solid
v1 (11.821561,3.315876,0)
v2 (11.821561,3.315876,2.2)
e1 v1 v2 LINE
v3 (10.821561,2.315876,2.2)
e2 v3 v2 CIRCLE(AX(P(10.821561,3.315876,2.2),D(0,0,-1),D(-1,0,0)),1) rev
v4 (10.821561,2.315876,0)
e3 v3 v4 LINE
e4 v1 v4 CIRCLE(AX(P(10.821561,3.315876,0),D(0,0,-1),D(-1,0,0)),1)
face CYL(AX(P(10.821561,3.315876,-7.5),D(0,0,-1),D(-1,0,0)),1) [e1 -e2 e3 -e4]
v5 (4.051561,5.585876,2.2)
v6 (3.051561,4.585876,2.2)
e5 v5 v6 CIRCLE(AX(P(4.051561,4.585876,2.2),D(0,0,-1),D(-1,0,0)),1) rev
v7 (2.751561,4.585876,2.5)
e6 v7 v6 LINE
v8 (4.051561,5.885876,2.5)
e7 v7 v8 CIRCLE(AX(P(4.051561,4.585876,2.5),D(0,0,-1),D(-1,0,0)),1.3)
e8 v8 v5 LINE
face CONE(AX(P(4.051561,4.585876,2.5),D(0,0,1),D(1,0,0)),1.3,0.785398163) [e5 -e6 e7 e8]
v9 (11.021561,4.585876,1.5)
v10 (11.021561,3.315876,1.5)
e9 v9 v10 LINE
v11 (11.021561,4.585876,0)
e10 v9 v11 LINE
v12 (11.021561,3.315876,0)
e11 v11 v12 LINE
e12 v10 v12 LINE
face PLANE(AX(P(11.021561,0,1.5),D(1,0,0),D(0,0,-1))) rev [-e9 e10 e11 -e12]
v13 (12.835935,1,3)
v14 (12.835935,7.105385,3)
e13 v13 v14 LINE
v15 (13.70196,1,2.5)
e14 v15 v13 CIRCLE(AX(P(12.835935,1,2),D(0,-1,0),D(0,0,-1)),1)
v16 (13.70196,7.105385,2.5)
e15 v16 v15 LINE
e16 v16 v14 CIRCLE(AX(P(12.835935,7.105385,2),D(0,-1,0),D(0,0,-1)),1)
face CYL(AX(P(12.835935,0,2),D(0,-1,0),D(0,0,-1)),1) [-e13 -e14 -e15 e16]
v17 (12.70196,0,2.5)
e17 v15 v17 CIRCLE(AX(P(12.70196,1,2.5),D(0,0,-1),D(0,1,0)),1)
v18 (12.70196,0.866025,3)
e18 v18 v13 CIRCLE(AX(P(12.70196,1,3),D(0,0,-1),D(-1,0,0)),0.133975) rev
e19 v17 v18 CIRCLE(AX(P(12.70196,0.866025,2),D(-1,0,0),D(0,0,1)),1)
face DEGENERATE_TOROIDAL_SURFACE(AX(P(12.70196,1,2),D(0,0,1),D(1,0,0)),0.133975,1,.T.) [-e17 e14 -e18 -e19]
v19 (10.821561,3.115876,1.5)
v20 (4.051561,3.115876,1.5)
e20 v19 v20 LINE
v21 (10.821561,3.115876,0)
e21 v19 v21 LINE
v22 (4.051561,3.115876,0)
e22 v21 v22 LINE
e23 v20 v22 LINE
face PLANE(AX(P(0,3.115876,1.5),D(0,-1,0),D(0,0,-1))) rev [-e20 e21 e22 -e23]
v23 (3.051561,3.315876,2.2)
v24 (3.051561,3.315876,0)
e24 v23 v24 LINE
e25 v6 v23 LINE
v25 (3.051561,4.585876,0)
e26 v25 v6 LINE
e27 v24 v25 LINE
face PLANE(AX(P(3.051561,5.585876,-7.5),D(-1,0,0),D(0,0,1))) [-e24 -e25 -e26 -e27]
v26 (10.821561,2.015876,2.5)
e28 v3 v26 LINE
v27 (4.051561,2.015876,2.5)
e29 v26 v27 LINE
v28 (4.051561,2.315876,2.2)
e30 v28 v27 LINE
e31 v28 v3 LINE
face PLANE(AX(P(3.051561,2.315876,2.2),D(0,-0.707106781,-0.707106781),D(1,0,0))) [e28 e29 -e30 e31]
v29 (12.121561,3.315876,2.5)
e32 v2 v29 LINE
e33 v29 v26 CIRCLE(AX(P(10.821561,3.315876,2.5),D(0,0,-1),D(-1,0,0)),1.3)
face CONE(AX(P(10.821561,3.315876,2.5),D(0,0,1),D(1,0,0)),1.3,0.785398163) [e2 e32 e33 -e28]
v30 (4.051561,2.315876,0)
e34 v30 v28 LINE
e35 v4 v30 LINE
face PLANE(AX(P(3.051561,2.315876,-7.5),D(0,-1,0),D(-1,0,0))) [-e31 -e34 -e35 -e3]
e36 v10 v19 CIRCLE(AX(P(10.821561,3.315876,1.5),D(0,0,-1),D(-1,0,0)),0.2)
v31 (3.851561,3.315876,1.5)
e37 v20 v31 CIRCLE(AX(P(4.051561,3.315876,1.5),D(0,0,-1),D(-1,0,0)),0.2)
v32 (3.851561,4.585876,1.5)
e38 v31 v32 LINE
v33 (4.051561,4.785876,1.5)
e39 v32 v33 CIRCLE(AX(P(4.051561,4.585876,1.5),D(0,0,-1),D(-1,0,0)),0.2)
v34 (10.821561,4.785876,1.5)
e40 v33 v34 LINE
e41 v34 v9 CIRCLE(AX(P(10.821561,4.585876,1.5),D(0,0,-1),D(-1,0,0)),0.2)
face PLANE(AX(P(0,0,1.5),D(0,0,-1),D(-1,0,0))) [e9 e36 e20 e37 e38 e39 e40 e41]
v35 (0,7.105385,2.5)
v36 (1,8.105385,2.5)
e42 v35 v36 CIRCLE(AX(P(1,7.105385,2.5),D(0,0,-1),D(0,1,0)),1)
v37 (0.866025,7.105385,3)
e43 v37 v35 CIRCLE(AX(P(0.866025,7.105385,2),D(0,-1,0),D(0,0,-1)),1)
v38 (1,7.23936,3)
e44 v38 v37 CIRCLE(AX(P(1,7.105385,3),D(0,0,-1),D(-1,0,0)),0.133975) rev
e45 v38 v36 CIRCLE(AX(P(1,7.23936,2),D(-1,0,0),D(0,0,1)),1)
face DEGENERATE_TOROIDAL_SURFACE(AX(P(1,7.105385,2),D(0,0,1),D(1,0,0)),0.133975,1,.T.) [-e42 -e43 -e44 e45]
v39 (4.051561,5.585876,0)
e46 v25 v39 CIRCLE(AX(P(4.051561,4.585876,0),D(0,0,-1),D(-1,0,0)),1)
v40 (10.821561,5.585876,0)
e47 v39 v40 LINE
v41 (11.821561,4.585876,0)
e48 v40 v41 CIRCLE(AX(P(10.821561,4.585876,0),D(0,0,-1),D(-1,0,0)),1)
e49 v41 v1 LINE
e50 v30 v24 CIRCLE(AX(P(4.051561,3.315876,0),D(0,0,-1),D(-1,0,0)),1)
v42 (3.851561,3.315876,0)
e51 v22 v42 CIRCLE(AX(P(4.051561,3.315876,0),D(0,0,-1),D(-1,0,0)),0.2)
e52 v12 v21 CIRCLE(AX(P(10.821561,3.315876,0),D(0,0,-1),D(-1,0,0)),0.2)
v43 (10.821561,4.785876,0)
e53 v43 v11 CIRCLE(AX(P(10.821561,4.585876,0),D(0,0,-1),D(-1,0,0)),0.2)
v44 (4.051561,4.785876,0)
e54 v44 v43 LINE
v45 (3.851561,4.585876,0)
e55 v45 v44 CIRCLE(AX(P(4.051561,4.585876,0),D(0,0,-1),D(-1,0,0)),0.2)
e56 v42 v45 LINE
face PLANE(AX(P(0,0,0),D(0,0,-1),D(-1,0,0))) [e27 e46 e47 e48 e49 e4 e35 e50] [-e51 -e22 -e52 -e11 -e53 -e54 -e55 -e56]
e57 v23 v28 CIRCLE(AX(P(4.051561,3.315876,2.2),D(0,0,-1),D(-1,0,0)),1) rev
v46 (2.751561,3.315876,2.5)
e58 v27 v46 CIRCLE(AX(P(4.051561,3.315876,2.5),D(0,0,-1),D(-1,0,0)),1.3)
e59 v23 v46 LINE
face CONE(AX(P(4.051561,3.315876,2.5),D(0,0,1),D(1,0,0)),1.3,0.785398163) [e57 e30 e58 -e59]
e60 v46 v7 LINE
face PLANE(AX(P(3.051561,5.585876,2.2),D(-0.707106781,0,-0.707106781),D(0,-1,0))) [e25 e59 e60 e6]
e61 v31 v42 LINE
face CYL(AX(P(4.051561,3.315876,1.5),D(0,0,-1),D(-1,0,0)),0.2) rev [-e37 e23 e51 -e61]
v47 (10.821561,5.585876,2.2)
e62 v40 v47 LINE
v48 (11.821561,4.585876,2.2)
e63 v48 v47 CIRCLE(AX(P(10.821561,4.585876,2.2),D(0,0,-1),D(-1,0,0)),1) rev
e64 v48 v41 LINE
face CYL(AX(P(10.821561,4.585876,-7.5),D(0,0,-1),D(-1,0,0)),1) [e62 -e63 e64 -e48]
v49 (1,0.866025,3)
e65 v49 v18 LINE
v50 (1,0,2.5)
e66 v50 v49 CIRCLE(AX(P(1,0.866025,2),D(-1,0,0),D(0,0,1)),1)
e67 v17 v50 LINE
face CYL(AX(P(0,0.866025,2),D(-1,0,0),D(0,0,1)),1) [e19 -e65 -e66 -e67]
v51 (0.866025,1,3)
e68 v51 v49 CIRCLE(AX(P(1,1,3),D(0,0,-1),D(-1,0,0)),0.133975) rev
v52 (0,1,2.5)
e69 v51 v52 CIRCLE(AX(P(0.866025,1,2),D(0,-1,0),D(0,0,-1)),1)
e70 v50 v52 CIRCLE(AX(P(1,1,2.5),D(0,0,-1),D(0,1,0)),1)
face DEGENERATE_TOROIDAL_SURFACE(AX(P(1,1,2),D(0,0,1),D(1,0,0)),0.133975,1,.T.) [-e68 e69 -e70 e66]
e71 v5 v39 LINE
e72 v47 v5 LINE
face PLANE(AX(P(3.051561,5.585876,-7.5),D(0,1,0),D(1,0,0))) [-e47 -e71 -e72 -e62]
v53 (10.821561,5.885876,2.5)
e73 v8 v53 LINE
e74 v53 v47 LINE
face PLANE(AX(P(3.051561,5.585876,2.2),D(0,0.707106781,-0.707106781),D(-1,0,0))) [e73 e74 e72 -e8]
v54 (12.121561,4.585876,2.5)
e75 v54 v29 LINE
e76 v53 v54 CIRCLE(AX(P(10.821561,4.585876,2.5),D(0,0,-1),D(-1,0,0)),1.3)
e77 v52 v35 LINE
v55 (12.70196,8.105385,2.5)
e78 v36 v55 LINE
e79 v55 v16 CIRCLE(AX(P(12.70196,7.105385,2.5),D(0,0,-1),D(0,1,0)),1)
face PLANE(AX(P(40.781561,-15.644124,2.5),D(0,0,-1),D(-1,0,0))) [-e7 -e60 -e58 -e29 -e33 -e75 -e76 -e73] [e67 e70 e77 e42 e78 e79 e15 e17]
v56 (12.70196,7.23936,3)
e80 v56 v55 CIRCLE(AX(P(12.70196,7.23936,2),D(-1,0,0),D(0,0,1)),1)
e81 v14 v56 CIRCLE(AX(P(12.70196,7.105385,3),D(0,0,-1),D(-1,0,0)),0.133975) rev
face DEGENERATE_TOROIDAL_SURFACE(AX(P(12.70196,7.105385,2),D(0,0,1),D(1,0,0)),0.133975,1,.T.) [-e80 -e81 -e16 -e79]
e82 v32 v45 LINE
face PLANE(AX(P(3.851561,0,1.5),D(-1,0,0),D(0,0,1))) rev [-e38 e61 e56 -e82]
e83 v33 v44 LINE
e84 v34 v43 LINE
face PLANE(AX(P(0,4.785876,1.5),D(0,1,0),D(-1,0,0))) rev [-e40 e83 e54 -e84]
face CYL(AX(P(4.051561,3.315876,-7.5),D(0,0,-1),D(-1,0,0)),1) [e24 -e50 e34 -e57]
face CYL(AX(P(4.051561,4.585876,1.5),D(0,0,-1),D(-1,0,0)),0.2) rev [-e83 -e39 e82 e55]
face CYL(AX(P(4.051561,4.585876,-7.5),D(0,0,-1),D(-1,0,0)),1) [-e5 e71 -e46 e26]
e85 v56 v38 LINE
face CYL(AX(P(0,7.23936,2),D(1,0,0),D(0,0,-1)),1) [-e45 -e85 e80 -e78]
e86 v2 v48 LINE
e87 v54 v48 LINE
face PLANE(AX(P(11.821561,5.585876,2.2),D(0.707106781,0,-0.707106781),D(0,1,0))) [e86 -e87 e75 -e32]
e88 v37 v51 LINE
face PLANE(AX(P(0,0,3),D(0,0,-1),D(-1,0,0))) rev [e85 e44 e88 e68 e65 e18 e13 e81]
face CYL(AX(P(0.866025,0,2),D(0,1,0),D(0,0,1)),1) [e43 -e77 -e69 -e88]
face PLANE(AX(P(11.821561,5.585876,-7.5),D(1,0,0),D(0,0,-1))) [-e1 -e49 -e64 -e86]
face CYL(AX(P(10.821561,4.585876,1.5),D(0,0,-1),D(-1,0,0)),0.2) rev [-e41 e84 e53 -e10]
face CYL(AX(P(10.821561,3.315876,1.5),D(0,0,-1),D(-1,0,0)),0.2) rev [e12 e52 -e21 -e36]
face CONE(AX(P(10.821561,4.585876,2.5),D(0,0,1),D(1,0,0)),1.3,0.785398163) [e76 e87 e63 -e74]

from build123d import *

# Parameters (mm, degrees)
SKETCH1_W           = 13.701960198
SKETCH1_H           = 8.105384906
BOSS_EXTRUDE1_DEPTH = 3
CAVITY1_OUTLINE_W   = 13.701960198
CAVITY1_OUTLINE_H   = 8.105384906
CAVITY1_DEPTH       = 2.5
CUT_EXTRUDE1_DEPTH  = 1.5
FILLET1_R           = 1
FILLET2_R           = 1


with BuildPart() as part:
    # Sketch1 → Boss-Extrude1 (new body)
    with BuildSketch(Plane.XY):
        with Locations((6.850980099, 4.052692453)):
            Rectangle(SKETCH1_W, SKETCH1_H)
    extrude(amount=BOSS_EXTRUDE1_DEPTH)

    # Cavity1: read off the stored shape, not the designer's step
    # Cavity1 outline → Cavity1 (cut)
    with BuildSketch(Plane.XY):
        with Locations((6.850980099, 4.052692453)):
            Rectangle(CAVITY1_OUTLINE_W, CAVITY1_OUTLINE_H)
        with BuildLine():
            Line((11.821561481, 4.585876247), (11.821561481, 3.315876247))
            ThreePointArc((11.821561481, 3.315876247), (11.528668262, 2.608769466), (10.821561481, 2.315876247))
            Line((10.821561481, 2.315876247), (4.051561481, 2.315876247))
            ThreePointArc((4.051561481, 2.315876247), (3.3444547, 2.608769466), (3.051561481, 3.315876247))
            Line((3.051561481, 3.315876247), (3.051561481, 4.585876247))
            ThreePointArc((3.051561481, 4.585876247), (3.3444547, 5.292983028), (4.051561481, 5.585876247))
            Line((4.051561481, 5.585876247), (10.821561481, 5.585876247))
            ThreePointArc((10.821561481, 5.585876247), (11.528668262, 5.292983028), (11.821561481, 4.585876247))
        make_face(mode=Mode.SUBTRACT)
    extrude(amount=CAVITY1_DEPTH, mode=Mode.SUBTRACT)

    # Cavity1 2: loft between two sections, ruled curve by curve
    cavity1_2_from = [
        Edge.make_three_point_arc((3.051561481, 3.315876247, 2.2), (3.3444547, 2.608769466, 2.2), (4.051561481, 2.315876247, 2.2)),
        Edge.make_three_point_arc((4.051561481, 5.585876247, 2.2), (3.3444547, 5.292983028, 2.2), (3.051561481, 4.585876247, 2.2)),
        Edge.make_three_point_arc((10.821561481, 2.315876247, 2.2), (11.528668262, 2.608769466, 2.2), (11.821561481, 3.315876247, 2.2)),
        Edge.make_three_point_arc((11.821561481, 4.585876247, 2.2), (11.528668262, 5.292983028, 2.2), (10.821561481, 5.585876247, 2.2)),
        Edge.make_line((3.051561481, 4.585876247, 2.2), (3.051561481, 3.315876247, 2.2)),
        Edge.make_line((4.051561481, 2.315876247, 2.2), (10.821561481, 2.315876247, 2.2)),
        Edge.make_line((4.051561481, 5.585876247, 2.2), (10.821561481, 5.585876247, 2.2)),
        Edge.make_line((11.821561481, 3.315876247, 2.2), (11.821561481, 4.585876247, 2.2)),
    ]
    cavity1_2_to = [
        Edge.make_three_point_arc((2.751561481, 3.315876247, 2.5), (3.132322665, 2.396637431, 2.5), (4.051561481, 2.015876247, 2.5)),
        Edge.make_three_point_arc((4.051561481, 5.885876247, 2.5), (3.132322665, 5.505115063, 2.5), (2.751561481, 4.585876247, 2.5)),
        Edge.make_three_point_arc((10.821561481, 2.015876247, 2.5), (11.740800297, 2.396637431, 2.5), (12.121561481, 3.315876247, 2.5)),
        Edge.make_three_point_arc((12.121561481, 4.585876247, 2.5), (11.740800297, 5.505115063, 2.5), (10.821561481, 5.885876247, 2.5)),
        Edge.make_line((2.751561481, 4.585876247, 2.5), (2.751561481, 3.315876247, 2.5)),
        Edge.make_line((4.051561481, 2.015876247, 2.5), (10.821561481, 2.015876247, 2.5)),
        Edge.make_line((4.051561481, 5.885876247, 2.5), (10.821561481, 5.885876247, 2.5)),
        Edge.make_line((12.121561481, 3.315876247, 2.5), (12.121561481, 4.585876247, 2.5)),
    ]
    cavity1_2 = Solid(Shell([*[Face.make_surface_from_curves(cavity1_2_from[k], cavity1_2_to[k]) for k in range(8)], Face(Wire(cavity1_2_from)), Face(Wire(cavity1_2_to))]))
    add(cavity1_2)

    # Sketch2 → Cut-Extrude1 (cut)
    with BuildSketch(Plane(origin=(0, 0, 0), x_dir=(-1, 0, 0), z_dir=(0, 0, -1))):
        with BuildLine():
            Line((-3.851561481, 3.315876247), (-3.851561481, 4.585876247))
            ThreePointArc((-3.851561481, 4.585876247), (-3.910140125, 4.727297603), (-4.051561481, 4.785876247))
            Line((-4.051561481, 4.785876247), (-10.821561481, 4.785876247))
            ThreePointArc((-10.821561481, 4.785876247), (-10.962982837, 4.727297603), (-11.021561481, 4.585876247))
            Line((-11.021561481, 4.585876247), (-11.021561481, 3.315876247))
            ThreePointArc((-11.021561481, 3.315876247), (-10.962982837, 3.174454891), (-10.821561481, 3.115876247))
            Line((-10.821561481, 3.115876247), (-4.051561481, 3.115876247))
            ThreePointArc((-4.051561481, 3.115876247), (-3.910140125, 3.174454891), (-3.851561481, 3.315876247))
        make_face()
    extrude(amount=-CUT_EXTRUDE1_DEPTH, mode=Mode.SUBTRACT)

    # Fillet1
    fillet1_edges = [part.edges().sort_by_distance(p)[0] for p in [
        (0, 8.105384906, 2.75),
        (13.701960198, 8.105384906, 2.75),
        (13.701960198, 0, 2.75),
        (0, 0, 2.75),
    ]]
    fillet(fillet1_edges, radius=FILLET1_R)

    # Fillet2
    # the kernel refuses this fillet: 1 mm, written as the material it takes off along each edge
    with BuildSketch(Plane(origin=(1, 1, 3), x_dir=(-1, 0, 0), z_dir=(0, 1, 0))) as fillet2_piece_1:
        with BuildLine():
            CenterArc((0.133974596, -1), FILLET2_R, 30, 60)
            Line((0.133974596, 0), (0.133974596, 0.02))
            Line((0.133974596, 0.02), (1, 0.02))
            Line((1, 0.02), (1.02, 0))
            ThreePointArc((1.02, 0), (1.02, -0.25), (1.017320508, -0.49))
            Line((1.017320508, -0.49), (1, -0.5))
        make_face()
    revolve(axis=Axis((1, 1, 3), (0, 0, 1)), revolution_arc=90, mode=Mode.SUBTRACT)
    with BuildSketch(Plane(origin=(0, 7.105384906, 3), x_dir=(0, 0, -1), z_dir=(0, -1, 0)), Plane(origin=(13.701960198, 1, 3), x_dir=(-5.230269550793082e-10, 0, -1.0), z_dir=(0, 1, 0))) as fillet2_piece_2:
        with BuildLine():
            CenterArc((1, 0.866025404), FILLET2_R, 180, 60)
            Line((0, 0.866025404), (-0.02, 0.866025404))
            Line((-0.02, 0.866025404), (-0.02, 0))
            Line((-0.02, 0), (0, -0.02))
            ThreePointArc((0, -0.02), (0.25, -0.02), (0.49, -0.017320508))
            Line((0.49, -0.017320508), (0.5, 0))
        make_face()
    extrude(amount=6.105384906, mode=Mode.SUBTRACT)
    with BuildSketch(Plane(origin=(1, 7.105384906, 3), x_dir=(-1, 0, 0), z_dir=(0, -1, 0))) as fillet2_piece_3:
        with BuildLine():
            CenterArc((0.133974596, 1), FILLET2_R, 270, 60)
            Line((0.133974596, 0), (0.133974596, -0.02))
            Line((0.133974596, -0.02), (1, -0.02))
            Line((1, -0.02), (1.02, 0))
            ThreePointArc((1.02, 0), (1.02, 0.25), (1.017320508, 0.49))
            Line((1.017320508, 0.49), (1, 0.5))
        make_face()
    revolve(axis=Axis((1, 7.105384906, 3), (0, 0, -1)), revolution_arc=90, mode=Mode.SUBTRACT)
    with BuildSketch(Plane(origin=(12.701960198, 8.105384906, 3), x_dir=(0, -2.7725377549357952e-11, -1.0), z_dir=(-1, 0, 0)), Plane(origin=(1, 0, 3), x_dir=(0, 0, -1), z_dir=(1, 0, 0))) as fillet2_piece_4:
        with BuildLine():
            CenterArc((1, 0.866025404), FILLET2_R, 179.999999998, 60)
            Line((0, 0.866025404), (-0.02, 0.866025404))
            Line((-0.02, 0.866025404), (-0.02, 0))
            Line((-0.02, 0), (0, -0.02))
            ThreePointArc((0, -0.02), (0.25, -0.02), (0.49, -0.017320508))
            Line((0.49, -0.017320508), (0.5, 0))
        make_face()
    extrude(amount=11.701960198, mode=Mode.SUBTRACT)
    with BuildSketch(Plane(origin=(12.701960198, 7.105384906, 3), x_dir=(0, 1, 0), z_dir=(-1, 0, 0))) as fillet2_piece_5:
        with BuildLine():
            CenterArc((0.133974596, 1), FILLET2_R, 270, 60)
            Line((0.133974596, 0), (0.133974596, -0.02))
            Line((0.133974596, -0.02), (1, -0.02))
            Line((1, -0.02), (1.02, 0))
            ThreePointArc((1.02, 0), (1.02, 0.25), (1.017320508, 0.49))
            Line((1.017320508, 0.49), (1, 0.5))
        make_face()
    revolve(axis=Axis((12.701960198, 7.105384906, 3), (0, 0, -1)), revolution_arc=90, mode=Mode.SUBTRACT)
    with BuildSketch(Plane(origin=(12.701960198, 1, 3), x_dir=(0, -1, 0), z_dir=(-1, 0, 0))) as fillet2_piece_6:
        with BuildLine():
            CenterArc((0.133974596, -1), FILLET2_R, 30, 60)
            Line((0.133974596, 0), (0.133974596, 0.02))
            Line((0.133974596, 0.02), (1, 0.02))
            Line((1, 0.02), (1.02, 0))
            ThreePointArc((1.02, 0), (1.02, -0.25), (1.017320508, -0.49))
            Line((1.017320508, -0.49), (1, -0.5))
        make_face()
    revolve(axis=Axis((12.701960198, 1, 3), (0, 0, 1)), revolution_arc=90, mode=Mode.SUBTRACT)


solid = part.part
